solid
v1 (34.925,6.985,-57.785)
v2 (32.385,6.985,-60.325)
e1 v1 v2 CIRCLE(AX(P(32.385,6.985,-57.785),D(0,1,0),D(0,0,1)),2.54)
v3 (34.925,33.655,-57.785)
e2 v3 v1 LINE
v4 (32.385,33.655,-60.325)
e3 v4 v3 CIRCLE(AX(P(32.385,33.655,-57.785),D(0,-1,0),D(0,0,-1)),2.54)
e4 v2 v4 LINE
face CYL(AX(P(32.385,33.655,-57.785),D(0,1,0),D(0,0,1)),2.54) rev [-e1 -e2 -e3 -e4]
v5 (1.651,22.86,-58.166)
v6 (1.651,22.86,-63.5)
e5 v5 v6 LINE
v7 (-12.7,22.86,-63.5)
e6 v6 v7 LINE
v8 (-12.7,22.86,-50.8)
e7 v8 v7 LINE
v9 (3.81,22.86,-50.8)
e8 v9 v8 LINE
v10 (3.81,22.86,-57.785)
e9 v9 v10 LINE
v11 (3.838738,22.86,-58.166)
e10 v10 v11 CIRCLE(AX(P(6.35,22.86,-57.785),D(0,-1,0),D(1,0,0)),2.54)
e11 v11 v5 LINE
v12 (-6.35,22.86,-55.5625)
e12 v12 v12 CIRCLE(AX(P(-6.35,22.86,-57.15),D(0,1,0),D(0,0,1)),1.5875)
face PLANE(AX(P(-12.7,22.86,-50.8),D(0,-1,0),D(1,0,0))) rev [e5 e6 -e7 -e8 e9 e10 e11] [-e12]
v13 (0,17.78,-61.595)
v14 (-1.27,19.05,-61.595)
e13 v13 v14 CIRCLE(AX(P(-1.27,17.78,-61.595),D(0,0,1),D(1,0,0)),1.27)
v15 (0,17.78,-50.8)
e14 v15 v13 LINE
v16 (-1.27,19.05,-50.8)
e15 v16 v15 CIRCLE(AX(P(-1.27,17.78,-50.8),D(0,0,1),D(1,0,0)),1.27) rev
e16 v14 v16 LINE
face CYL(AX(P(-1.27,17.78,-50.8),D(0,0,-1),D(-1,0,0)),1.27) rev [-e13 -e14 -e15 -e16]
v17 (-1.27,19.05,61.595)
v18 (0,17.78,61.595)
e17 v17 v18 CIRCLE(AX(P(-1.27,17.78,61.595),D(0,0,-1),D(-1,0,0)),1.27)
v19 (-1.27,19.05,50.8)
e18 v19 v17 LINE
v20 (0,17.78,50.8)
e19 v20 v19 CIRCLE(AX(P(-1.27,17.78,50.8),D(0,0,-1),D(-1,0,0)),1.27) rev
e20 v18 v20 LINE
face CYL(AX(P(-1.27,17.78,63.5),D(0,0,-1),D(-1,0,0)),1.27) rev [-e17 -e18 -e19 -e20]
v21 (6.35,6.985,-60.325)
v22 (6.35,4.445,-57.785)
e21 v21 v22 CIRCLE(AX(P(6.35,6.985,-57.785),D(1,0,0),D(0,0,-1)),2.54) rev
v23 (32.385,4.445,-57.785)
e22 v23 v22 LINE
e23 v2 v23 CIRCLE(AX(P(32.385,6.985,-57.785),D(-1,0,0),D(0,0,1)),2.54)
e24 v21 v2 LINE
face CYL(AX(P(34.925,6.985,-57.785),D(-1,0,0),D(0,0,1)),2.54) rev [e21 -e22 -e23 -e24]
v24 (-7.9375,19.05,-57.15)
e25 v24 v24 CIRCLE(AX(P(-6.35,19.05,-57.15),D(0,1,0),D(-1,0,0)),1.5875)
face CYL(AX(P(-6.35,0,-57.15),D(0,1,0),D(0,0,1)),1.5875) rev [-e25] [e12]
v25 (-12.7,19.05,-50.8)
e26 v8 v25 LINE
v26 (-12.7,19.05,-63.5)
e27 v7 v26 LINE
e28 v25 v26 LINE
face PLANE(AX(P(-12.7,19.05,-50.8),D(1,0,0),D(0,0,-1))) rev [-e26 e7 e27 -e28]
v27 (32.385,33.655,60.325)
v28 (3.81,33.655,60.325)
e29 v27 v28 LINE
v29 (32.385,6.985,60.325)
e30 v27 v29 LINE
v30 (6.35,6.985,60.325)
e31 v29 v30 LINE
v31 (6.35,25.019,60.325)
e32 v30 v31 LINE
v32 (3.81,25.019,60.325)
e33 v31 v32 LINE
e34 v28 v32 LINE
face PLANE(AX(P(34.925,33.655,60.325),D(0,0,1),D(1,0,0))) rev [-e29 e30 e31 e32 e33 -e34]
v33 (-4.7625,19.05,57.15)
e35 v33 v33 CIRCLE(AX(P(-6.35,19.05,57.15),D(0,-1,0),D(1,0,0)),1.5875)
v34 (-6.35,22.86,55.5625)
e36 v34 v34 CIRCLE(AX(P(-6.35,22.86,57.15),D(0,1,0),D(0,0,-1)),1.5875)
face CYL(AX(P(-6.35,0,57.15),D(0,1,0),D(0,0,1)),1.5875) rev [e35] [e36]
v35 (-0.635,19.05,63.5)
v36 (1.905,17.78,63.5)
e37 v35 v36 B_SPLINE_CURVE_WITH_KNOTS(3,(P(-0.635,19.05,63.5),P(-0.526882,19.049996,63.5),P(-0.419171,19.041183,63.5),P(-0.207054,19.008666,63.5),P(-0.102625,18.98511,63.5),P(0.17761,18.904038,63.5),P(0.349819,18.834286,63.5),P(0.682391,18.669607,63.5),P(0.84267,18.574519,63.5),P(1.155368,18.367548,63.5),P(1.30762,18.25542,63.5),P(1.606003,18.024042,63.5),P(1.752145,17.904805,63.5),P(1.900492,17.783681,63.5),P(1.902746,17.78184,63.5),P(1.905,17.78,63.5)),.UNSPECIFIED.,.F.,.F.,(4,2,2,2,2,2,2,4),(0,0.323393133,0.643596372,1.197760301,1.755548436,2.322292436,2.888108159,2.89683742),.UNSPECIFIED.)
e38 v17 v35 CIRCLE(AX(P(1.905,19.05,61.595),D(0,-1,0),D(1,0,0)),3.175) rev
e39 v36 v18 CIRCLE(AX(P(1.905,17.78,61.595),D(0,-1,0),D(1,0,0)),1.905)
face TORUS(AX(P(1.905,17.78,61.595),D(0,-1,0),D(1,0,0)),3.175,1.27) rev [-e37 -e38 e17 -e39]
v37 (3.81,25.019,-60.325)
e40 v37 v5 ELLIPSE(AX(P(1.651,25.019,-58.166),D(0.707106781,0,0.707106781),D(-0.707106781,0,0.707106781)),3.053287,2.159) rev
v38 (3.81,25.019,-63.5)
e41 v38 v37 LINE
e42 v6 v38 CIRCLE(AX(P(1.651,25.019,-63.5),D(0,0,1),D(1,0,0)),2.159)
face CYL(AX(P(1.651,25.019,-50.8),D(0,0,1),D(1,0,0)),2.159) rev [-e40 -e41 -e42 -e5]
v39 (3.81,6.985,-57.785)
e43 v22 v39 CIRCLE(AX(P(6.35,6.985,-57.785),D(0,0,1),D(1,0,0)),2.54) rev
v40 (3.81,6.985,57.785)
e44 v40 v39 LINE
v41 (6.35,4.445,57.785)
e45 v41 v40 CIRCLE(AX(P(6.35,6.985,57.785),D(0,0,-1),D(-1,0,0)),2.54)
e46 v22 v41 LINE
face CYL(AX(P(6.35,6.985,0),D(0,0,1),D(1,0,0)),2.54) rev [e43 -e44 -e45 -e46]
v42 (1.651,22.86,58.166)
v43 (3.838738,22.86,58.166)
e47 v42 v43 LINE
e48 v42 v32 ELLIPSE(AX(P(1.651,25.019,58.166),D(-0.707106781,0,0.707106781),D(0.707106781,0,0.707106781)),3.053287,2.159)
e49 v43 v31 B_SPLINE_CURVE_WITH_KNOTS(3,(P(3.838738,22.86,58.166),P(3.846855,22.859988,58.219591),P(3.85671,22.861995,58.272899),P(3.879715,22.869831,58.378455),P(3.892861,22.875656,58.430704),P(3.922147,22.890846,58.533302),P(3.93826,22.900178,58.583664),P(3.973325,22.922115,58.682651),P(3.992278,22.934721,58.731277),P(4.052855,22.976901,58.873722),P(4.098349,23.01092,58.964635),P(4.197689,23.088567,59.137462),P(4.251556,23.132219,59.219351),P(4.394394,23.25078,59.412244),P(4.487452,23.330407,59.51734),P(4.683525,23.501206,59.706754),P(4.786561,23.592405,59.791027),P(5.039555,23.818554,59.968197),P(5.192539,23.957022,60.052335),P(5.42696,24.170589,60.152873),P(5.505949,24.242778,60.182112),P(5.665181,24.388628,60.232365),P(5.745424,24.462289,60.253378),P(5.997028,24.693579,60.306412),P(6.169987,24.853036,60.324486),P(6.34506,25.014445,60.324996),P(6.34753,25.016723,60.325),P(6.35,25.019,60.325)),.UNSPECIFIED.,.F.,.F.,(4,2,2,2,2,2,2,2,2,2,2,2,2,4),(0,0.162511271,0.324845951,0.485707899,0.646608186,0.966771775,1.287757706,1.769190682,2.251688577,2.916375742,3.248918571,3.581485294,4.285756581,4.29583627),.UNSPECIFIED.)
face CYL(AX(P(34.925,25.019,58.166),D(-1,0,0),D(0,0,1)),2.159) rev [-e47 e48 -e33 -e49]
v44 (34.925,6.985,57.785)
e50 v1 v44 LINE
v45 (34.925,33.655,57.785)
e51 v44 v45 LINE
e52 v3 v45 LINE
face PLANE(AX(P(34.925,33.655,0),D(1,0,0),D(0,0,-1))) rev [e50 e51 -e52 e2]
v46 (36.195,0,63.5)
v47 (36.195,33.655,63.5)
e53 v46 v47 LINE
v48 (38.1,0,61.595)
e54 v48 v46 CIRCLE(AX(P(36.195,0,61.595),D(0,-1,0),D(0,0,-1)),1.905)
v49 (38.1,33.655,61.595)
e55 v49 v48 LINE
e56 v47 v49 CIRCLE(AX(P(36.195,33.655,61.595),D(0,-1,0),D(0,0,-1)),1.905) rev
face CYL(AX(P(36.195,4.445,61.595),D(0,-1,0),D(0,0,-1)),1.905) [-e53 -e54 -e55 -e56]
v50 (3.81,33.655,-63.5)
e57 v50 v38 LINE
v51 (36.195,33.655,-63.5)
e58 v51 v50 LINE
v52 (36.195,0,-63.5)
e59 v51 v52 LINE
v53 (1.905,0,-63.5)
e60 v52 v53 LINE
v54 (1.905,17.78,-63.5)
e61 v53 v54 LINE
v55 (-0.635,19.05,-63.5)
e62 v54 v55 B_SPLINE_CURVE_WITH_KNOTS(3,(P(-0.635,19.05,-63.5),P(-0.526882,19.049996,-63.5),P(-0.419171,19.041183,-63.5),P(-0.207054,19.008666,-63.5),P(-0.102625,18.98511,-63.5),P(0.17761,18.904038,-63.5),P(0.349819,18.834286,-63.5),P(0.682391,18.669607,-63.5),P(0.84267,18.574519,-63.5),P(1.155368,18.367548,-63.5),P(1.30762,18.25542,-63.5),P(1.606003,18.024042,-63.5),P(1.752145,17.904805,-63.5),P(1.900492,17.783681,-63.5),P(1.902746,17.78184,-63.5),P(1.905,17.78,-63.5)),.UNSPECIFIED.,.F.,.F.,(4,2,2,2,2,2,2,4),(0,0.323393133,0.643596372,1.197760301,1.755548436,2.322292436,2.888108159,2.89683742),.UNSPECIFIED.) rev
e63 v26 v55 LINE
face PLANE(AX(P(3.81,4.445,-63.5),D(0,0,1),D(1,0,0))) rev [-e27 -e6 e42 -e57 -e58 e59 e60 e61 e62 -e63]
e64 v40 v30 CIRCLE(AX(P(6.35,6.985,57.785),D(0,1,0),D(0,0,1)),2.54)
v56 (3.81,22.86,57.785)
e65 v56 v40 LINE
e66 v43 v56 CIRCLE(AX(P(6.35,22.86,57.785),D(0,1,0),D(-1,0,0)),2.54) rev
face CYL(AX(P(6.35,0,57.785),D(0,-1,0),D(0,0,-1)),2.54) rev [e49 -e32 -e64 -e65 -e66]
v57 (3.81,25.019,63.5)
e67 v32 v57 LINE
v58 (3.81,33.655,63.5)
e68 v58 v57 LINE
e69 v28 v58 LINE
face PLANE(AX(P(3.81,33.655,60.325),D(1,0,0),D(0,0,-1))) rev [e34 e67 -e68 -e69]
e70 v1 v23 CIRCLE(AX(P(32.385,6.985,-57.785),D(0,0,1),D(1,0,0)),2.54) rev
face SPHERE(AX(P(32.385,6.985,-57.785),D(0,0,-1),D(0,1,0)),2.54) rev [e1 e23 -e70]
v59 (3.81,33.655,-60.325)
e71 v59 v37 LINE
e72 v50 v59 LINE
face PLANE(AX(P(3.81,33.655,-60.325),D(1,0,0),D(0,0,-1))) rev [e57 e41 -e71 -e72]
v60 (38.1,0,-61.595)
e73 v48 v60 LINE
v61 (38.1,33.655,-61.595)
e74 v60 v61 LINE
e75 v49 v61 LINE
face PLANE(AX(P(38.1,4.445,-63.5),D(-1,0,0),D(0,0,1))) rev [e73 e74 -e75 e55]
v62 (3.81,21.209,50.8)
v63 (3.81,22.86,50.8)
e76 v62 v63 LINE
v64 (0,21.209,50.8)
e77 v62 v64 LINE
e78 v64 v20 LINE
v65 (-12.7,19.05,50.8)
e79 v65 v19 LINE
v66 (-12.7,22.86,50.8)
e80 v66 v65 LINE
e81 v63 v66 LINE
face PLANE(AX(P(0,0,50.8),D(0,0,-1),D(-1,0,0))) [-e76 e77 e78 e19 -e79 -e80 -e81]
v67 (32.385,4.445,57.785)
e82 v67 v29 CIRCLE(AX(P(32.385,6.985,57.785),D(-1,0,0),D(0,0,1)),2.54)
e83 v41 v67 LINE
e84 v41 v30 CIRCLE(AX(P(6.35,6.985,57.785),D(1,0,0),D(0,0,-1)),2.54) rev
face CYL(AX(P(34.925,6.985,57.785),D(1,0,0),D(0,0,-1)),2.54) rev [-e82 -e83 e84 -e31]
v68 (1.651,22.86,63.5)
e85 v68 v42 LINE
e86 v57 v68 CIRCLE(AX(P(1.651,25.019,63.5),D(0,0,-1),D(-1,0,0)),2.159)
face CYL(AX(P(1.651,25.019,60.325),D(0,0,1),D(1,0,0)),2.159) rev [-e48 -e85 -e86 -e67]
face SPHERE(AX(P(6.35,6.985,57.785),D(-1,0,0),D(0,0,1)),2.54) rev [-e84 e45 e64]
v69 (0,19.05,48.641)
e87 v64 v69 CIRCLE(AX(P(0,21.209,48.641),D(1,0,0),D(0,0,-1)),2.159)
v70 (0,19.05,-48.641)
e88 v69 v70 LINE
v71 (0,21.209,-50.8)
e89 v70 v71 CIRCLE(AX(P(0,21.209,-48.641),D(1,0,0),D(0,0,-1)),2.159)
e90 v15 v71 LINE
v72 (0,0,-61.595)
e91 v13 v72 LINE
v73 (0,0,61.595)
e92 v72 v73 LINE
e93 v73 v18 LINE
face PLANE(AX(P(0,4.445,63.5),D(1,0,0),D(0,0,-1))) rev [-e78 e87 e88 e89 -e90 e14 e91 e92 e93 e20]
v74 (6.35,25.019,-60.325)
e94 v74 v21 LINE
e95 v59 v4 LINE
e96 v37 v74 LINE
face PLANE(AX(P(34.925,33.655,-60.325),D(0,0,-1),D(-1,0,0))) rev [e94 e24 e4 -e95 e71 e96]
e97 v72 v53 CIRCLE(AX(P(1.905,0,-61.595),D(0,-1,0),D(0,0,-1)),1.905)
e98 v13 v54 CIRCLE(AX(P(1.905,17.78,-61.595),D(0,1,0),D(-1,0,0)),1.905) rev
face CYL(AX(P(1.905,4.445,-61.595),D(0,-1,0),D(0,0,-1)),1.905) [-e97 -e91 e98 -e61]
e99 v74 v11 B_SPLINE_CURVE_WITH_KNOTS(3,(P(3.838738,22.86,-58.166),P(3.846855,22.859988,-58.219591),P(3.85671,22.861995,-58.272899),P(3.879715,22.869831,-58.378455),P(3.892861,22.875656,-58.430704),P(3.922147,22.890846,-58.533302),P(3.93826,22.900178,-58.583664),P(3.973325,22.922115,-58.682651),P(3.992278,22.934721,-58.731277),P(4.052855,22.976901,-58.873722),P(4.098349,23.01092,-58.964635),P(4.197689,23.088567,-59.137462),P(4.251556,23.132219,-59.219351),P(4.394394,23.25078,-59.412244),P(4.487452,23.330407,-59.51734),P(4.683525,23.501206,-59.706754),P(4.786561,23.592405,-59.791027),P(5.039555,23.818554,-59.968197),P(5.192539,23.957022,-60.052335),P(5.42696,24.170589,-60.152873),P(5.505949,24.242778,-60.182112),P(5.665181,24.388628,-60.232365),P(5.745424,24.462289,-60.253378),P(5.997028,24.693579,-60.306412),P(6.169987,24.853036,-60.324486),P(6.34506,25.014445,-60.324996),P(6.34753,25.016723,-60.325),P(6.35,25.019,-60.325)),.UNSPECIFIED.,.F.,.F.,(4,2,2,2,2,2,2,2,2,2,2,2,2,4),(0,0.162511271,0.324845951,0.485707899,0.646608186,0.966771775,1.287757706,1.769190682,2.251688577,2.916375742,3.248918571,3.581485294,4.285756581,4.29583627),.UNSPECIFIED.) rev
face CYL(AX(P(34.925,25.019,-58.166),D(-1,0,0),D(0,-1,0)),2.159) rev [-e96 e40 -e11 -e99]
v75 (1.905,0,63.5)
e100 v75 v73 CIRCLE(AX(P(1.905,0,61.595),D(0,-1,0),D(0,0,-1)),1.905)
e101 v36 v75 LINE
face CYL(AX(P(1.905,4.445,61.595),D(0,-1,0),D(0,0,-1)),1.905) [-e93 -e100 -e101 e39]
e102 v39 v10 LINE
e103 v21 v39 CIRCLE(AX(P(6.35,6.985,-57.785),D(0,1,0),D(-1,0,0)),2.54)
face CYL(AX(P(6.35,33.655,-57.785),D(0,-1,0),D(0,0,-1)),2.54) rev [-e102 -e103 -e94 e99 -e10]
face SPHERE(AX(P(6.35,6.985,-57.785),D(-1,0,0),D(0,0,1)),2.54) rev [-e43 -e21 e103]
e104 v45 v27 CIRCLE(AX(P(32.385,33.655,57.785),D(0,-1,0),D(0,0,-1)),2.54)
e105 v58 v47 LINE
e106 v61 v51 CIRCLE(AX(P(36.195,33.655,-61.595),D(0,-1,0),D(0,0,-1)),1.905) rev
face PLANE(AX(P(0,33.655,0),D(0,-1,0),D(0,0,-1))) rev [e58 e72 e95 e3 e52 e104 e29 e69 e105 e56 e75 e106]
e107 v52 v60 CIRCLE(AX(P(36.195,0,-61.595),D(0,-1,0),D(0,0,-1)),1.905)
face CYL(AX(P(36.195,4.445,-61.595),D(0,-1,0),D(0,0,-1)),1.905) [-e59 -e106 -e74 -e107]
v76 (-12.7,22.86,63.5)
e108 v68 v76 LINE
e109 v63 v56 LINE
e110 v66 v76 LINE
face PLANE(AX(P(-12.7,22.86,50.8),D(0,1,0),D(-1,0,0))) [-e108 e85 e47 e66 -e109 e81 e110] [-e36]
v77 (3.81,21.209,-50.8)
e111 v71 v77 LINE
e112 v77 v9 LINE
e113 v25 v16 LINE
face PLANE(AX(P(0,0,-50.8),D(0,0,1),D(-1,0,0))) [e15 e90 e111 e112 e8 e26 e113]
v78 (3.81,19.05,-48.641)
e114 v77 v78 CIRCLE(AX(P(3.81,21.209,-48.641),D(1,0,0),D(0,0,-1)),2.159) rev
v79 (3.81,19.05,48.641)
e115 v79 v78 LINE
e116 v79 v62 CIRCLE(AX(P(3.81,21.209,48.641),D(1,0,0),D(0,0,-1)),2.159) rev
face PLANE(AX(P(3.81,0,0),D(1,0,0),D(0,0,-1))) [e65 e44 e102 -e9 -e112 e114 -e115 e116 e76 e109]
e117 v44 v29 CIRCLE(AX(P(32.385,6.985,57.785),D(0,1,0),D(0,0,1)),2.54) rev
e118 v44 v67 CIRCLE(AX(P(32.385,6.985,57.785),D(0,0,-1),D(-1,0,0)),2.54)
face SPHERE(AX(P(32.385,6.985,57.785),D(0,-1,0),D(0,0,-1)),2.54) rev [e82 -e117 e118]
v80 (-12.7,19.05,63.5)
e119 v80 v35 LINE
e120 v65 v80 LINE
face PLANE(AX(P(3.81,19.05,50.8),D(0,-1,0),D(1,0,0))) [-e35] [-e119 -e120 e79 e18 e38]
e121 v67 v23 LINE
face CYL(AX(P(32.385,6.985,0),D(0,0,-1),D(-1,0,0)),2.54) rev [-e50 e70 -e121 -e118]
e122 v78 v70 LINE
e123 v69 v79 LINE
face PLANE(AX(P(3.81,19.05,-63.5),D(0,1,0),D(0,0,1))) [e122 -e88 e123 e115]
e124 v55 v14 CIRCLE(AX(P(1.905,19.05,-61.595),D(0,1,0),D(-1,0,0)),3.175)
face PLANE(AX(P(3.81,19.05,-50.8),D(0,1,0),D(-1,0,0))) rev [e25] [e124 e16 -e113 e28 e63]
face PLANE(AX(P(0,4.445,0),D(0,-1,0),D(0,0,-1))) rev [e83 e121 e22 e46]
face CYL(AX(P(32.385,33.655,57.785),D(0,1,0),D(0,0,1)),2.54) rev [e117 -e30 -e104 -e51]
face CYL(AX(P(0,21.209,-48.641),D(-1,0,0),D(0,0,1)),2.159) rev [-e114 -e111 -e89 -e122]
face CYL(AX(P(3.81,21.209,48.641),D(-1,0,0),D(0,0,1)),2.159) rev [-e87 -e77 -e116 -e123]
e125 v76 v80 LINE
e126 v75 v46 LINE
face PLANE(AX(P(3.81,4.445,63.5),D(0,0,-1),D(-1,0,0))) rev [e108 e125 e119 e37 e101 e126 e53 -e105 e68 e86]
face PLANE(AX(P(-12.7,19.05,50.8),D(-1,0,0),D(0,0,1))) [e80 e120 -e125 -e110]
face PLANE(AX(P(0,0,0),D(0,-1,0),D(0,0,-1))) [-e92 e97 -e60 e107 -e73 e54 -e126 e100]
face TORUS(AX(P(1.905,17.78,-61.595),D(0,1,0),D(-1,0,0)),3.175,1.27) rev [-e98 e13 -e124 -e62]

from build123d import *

# Parameters (mm, degrees)
BOSS_EXTRUDE1_DEPTH = 4.445
SKETCH2_W           = 127
SKETCH2_H           = 19.05
BOSS_EXTRUDE2_DEPTH = 3.81
SKETCH3_W           = 16.51
SKETCH3_H           = 3.81
BOSS_EXTRUDE3_DEPTH = 12.7
SKETCH4_R           = 1.5875
CUT_EXTRUDE1_DEPTH  = 78.501223216
WALLS_DEPTH         = 29.21
FILLET5_R           = 2.54
FILLET7_R           = 1.905
FILLET8_R           = 2.159
FILLET9_R           = 1.27


with BuildPart() as part:
    # Sketch1 → Boss-Extrude1 (new body)
    with BuildSketch(Plane(origin=(0, 0, 0), x_dir=(1, 0, 0), z_dir=(0, 1, 0))):
        Polygon((0, -63.5), (0, 63.5), (3.81, 63.5), (38.1, 63.5), (38.1, -63.5), (3.81, -63.5), align=None)
    extrude(amount=BOSS_EXTRUDE1_DEPTH)

    # Sketch2 → Boss-Extrude2 (add)
    with BuildSketch(Plane.ZY):
        with Locations((0, 9.525)):
            Rectangle(SKETCH2_W, SKETCH2_H)
    extrude(amount=-BOSS_EXTRUDE2_DEPTH)

    # Sketch3 → Boss-Extrude3 (add)
    with BuildSketch(Plane.XY.offset(63.5)):
        with Locations((-4.445, 20.955)):
            Rectangle(SKETCH3_W, SKETCH3_H)
    boss_extrude3 = extrude(amount=-BOSS_EXTRUDE3_DEPTH)

    # Mirror1: Boss-Extrude3 across plane
    add(boss_extrude3.mirror(Plane.XY))

    # Sketch4 → Cut-Extrude1 (cut, through all)
    with BuildSketch(Plane(origin=(0, 22.86, 0), x_dir=(1, 0, 0), z_dir=(0, 1, 0))):
        with Locations(Location((-6.35, 57.15, 0), (0, 0, 270))):
            Circle(SKETCH4_R)
        with Locations((-6.35, -57.15)):
            Circle(SKETCH4_R)
    extrude(amount=-CUT_EXTRUDE1_DEPTH, mode=Mode.SUBTRACT)

    # Sketch6 → Walls (add)
    with BuildSketch(Plane(origin=(0, 4.445, 0), x_dir=(1, 0, 0), z_dir=(0, 1, 0))):
        Polygon((3.81, 63.5), (38.1, 63.5), (38.1, -63.5), (3.81, -63.5), (3.81, -60.325), (34.925, -60.325), (34.925, 0), (34.925, 60.325), (3.81, 60.325), align=None)
    extrude(amount=WALLS_DEPTH)

    # Fillet5
    fillet5_edges = [part.edges().sort_by_distance(p)[0] for p in [
        (3.81, 4.445, 0),
        (3.81, 13.6525, 60.325),
        (19.3675, 4.445, -60.325),
        (3.81, 13.6525, -60.325),
        (34.925, 4.445, 0),
        (34.925, 19.05, -60.325),
        (19.3675, 4.445, 60.325),
        (34.925, 19.05, 60.325),
    ]]
    fillet(fillet5_edges, radius=FILLET5_R)

    # Fillet7
    fillet7_edges = [part.edges().sort_by_distance(p)[0] for p in [
        (38.1, 16.8275, -63.5),
        (38.1, 16.8275, 63.5),
        (0, 9.525, 63.5),
        (0, 9.525, -63.5),
    ]]
    fillet(fillet7_edges, radius=FILLET7_R)

    # Fillet8
    fillet8_edges = [part.edges().sort_by_distance(p)[0] for p in [
        (5.08, 22.86, 60.325),
        (5.08, 22.86, -60.325),
        (1.905, 19.05, 50.8),
        (1.905, 19.05, -50.8),
        (3.81, 22.86, -61.9125),
        (3.81, 22.86, 61.9125),
    ]]
    fillet(fillet8_edges, radius=FILLET8_R)

    # Fillet9
    # the kernel refuses this fillet: 1.27 mm, written as the material it adds along each edge
    with BuildSketch(Plane(origin=(0, 19.05, 50.8), x_dir=(-1, 0, 0), z_dir=(0, 0, 1)), Plane(origin=(0, 19.05, -61.595), x_dir=(-1, 0, 0), z_dir=(0, 0, 1))) as fillet9_piece_1:
        with BuildLine():
            CenterArc((FILLET9_R, FILLET9_R), FILLET9_R, 180, 90)
            Line((0, FILLET9_R), (0, 0))
            Line((0, 0), (FILLET9_R, 0))
        make_face()
    extrude(amount=10.795)
    with BuildSketch(Plane(origin=(1.905, 19.05, -61.595), x_dir=(0.995343646445092, 0, 0.09638996566752997), z_dir=(-0.09638996566752997, 0, 0.995343646445092))) as fillet9_piece_2_section:
        with BuildLine():
            CenterArc((1.905 + FILLET9_R, -FILLET9_R), FILLET9_R, 90, 90)
            Line((1.905, -FILLET9_R), (1.905, 0))
            Line((1.905, 0), (1.905 + FILLET9_R, 0))
        make_face()
    fillet9_piece_2 = revolve(axis=Axis((1.905, 19.05, -61.595), (0, 1, 0)), revolution_arc=185.531326158, mode=Mode.PRIVATE)
    fillet9_piece_2 = split(fillet9_piece_2, bisect_by=Plane(origin=(1.905, 19.05, -63.5), z_dir=(0, 0, 1)), keep=Keep.TOP, mode=Mode.PRIVATE)
    add(fillet9_piece_2)
    with BuildSketch(Plane(origin=(1.905, 19.05, 61.595), x_dir=(0.995343646445092, 0, -0.09638996566752997), z_dir=(-0.09638996566752997, 0, -0.995343646445092))) as fillet9_piece_3_section:
        with BuildLine():
            CenterArc((1.905 + FILLET9_R, FILLET9_R), FILLET9_R, 180, 90)
            Line((1.905 + FILLET9_R, 0), (1.905, 0))
            Line((1.905, 0), (1.905, FILLET9_R))
        make_face()
    fillet9_piece_3 = revolve(axis=Axis((1.905, 19.05, 61.595), (0, -1, 0)), revolution_arc=185.531326158, mode=Mode.PRIVATE)
    fillet9_piece_3 = split(fillet9_piece_3, bisect_by=Plane(origin=(1.905, 19.05, 63.5), z_dir=(0, 0, -1)), keep=Keep.TOP, mode=Mode.PRIVATE)
    add(fillet9_piece_3)


solid = part.part
